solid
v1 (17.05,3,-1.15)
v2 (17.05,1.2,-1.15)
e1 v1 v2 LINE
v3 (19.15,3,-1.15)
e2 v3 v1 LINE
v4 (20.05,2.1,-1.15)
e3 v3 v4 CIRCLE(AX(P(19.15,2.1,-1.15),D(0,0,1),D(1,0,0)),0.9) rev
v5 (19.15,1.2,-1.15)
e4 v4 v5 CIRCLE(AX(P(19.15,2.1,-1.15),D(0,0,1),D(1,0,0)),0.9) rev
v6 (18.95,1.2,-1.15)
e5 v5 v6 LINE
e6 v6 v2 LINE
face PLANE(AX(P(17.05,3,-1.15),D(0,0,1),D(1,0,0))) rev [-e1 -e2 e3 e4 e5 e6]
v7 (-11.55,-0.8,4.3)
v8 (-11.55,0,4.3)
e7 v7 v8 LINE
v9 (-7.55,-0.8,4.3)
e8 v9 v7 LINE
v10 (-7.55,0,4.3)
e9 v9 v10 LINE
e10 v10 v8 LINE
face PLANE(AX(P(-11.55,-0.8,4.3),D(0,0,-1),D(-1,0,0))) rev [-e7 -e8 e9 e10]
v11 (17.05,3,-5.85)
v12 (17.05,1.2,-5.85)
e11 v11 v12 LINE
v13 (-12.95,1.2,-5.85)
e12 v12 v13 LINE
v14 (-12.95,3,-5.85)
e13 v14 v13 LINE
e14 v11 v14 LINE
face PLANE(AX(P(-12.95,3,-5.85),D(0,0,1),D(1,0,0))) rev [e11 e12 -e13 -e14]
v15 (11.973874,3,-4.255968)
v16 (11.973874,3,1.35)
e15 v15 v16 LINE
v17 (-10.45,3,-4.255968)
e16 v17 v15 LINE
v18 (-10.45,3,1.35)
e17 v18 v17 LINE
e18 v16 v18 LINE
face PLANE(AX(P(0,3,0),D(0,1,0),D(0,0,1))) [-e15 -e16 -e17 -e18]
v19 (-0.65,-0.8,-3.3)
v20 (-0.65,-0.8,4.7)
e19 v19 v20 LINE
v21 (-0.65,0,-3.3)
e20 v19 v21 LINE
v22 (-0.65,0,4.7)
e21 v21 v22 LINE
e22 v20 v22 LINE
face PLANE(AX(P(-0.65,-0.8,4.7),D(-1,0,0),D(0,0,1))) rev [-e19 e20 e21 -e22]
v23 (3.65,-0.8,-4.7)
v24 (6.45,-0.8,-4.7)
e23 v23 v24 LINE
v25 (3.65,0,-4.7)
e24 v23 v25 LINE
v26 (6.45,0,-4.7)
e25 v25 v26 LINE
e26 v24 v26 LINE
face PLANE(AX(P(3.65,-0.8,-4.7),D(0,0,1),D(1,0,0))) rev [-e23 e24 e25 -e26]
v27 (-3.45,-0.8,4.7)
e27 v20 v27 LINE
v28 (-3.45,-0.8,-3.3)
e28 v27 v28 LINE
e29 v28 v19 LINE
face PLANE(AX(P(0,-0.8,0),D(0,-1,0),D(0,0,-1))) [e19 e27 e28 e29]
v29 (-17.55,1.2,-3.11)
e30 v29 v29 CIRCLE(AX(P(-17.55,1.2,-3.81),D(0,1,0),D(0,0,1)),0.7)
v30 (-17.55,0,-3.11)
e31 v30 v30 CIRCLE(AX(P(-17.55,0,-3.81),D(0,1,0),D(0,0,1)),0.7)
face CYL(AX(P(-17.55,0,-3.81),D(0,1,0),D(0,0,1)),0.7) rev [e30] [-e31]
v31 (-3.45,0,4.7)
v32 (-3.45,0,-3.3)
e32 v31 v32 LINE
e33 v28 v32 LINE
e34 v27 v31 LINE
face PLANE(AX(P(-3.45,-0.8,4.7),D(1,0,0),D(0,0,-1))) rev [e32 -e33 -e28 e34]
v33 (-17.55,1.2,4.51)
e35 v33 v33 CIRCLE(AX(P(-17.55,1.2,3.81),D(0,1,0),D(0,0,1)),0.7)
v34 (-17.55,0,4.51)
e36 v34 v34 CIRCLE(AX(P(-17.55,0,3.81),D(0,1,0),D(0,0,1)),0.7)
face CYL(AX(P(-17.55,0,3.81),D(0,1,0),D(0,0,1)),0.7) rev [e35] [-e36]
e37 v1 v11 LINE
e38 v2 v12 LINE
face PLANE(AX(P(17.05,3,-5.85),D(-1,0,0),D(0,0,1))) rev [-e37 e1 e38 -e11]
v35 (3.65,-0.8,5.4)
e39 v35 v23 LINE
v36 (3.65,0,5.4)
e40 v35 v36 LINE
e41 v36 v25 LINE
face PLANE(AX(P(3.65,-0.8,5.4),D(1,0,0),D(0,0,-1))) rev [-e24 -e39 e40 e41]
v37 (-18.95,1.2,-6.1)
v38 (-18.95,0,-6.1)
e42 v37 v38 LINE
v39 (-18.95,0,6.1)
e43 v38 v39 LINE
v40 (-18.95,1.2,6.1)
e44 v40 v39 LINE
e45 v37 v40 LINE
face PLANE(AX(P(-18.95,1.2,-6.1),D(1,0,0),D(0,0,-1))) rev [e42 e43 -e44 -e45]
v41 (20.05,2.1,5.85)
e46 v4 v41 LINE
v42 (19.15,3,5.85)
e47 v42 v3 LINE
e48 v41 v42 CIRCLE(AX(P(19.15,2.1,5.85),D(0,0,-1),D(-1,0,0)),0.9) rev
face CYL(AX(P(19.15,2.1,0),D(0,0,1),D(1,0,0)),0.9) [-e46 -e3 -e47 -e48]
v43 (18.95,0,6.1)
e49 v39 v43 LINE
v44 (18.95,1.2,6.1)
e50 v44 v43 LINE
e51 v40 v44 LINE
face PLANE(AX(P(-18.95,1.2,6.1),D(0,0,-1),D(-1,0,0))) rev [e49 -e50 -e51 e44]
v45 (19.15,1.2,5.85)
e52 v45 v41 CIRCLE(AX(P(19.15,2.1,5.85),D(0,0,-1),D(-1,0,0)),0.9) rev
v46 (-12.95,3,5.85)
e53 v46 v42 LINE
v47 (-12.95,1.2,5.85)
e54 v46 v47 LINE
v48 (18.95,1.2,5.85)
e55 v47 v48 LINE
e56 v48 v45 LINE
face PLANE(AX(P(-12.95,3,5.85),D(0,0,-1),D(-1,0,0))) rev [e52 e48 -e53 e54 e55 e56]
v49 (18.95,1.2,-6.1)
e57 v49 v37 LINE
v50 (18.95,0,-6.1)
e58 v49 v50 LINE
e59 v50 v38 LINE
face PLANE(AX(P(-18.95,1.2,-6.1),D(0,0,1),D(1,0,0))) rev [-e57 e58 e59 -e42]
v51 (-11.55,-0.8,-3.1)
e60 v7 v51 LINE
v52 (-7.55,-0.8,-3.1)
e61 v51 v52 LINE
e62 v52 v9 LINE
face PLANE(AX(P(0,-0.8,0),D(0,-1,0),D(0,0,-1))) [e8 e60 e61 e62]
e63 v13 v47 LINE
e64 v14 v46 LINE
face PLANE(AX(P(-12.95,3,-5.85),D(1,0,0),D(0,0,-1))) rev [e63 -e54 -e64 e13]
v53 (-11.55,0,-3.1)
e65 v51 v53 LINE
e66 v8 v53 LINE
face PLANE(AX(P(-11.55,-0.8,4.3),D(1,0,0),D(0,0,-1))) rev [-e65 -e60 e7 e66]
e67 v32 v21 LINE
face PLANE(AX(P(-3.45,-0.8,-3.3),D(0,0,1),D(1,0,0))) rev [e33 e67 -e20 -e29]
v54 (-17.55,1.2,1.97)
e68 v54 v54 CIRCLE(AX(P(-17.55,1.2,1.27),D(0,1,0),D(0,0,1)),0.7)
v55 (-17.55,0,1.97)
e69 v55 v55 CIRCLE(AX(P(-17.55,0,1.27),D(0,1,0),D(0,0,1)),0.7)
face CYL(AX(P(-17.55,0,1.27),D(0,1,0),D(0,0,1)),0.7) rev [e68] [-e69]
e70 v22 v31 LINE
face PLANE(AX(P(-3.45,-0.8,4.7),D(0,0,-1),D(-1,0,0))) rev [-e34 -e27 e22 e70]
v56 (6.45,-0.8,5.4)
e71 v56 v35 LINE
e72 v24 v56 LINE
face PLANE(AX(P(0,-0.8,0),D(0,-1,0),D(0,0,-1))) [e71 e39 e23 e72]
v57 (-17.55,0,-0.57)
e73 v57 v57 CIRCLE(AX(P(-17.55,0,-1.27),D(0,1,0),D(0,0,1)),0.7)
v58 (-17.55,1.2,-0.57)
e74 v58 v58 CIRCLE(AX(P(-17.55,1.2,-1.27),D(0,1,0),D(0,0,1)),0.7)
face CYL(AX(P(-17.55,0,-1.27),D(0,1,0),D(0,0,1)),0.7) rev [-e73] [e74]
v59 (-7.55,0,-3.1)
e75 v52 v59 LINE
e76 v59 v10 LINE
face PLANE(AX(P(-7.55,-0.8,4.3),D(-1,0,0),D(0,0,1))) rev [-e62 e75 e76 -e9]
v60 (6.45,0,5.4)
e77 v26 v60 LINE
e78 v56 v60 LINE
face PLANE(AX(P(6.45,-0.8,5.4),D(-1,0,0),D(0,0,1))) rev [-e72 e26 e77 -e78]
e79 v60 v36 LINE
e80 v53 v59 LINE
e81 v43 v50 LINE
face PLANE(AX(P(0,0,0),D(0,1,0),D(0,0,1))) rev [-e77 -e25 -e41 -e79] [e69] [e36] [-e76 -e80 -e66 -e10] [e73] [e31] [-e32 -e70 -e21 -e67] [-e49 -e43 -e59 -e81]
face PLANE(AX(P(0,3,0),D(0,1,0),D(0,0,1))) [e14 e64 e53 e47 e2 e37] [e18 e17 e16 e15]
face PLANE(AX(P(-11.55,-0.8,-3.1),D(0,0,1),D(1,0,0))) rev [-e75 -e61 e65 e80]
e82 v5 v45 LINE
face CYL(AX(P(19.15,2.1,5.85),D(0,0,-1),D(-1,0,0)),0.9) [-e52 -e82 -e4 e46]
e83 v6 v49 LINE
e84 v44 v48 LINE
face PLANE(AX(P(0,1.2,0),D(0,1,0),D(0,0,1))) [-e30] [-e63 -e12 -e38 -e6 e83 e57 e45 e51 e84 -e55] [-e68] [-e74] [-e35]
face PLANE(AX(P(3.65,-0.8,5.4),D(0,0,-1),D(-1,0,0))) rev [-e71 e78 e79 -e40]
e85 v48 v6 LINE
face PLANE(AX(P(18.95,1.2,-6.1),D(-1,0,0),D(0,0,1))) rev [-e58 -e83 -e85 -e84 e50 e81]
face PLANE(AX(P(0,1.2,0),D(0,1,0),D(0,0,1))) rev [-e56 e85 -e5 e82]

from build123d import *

# Parameters (mm, degrees)
SKETCH_1_W          = 37.9
SKETCH_1_H          = 12.2
EXTRUDE_1_DEPTH     = 1.2
EXTRUDE_2_DEPTH     = 1.8
FILLET_1_R          = 0.9
SKETCH_4_R          = 0.7
CUT_EXTRUDE_1_DEPTH = 22.034554904
SKETCH_5_W          = 2.8
SKETCH_5_H          = 10.1
SKETCH_5_H_2        = 8
SKETCH_5_W_2        = 4
SKETCH_5_H_3        = 7.4
EXTRUDE_3_DEPTH     = 0.8


with BuildPart() as part:
    # Эскиз1 → Бобышка-Вытянуть1 (new body)
    with BuildSketch(Plane(origin=(0, 0, 0), x_dir=(1, 0, 0), z_dir=(0, 1, 0))):
        Rectangle(SKETCH_1_W, SKETCH_1_H)
    extrude(amount=EXTRUDE_1_DEPTH)

    # Эскиз2 → Бобышка-Вытянуть2 (add)
    with BuildSketch(Plane(origin=(0, 1.2, 0), x_dir=(1, 0, 0), z_dir=(0, 1, 0))):
        Polygon((-12.95, 5.85), (17.05, 5.85), (17.05, 1.15), (20.05, 1.15), (20.05, -5.85), (17.05, -5.85), (-12.95, -5.85), align=None)
    extrude(amount=EXTRUDE_2_DEPTH)

    # Скругление1
    fillet_1_edges = [part.edges().sort_by_distance(p)[0] for p in [
        (20.05, 1.2, 2.35),
        (20.05, 3, 2.35),
    ]]
    fillet(fillet_1_edges, radius=FILLET_1_R - 0.0001)  # a hair under: the kernel refuses the full size

    # Эскиз4 → Вырез-Вытянуть1 (cut, through all)
    with BuildSketch(Plane(origin=(0, 1.2, 0), x_dir=(1, 0, 0), z_dir=(0, 1, 0))):
        with Locations(Location((-17.55, 3.81, 0), (0, 0, 270))):
            Circle(SKETCH_4_R)
        with Locations(Location((-17.55, 1.27, 0), (0, 0, 270))):
            Circle(SKETCH_4_R)
        with Locations(Location((-17.55, -1.27, 0), (0, 0, 270))):
            Circle(SKETCH_4_R)
        with Locations(Location((-17.55, -3.81, 0), (0, 0, 270))):
            Circle(SKETCH_4_R)
    extrude(amount=-CUT_EXTRUDE_1_DEPTH, mode=Mode.SUBTRACT)

    # Эскиз5 → Бобышка-Вытянуть3 (add)
    with BuildSketch(Plane.XZ):
        with Locations((5.05, 0.35)):
            Rectangle(SKETCH_5_W, SKETCH_5_H)
        with Locations((-2.05, 0.7)):
            Rectangle(SKETCH_5_W, SKETCH_5_H_2)
        with Locations((-9.55, 0.6)):
            Rectangle(SKETCH_5_W_2, SKETCH_5_H_3)
    extrude(amount=EXTRUDE_3_DEPTH)


solid = part.part
